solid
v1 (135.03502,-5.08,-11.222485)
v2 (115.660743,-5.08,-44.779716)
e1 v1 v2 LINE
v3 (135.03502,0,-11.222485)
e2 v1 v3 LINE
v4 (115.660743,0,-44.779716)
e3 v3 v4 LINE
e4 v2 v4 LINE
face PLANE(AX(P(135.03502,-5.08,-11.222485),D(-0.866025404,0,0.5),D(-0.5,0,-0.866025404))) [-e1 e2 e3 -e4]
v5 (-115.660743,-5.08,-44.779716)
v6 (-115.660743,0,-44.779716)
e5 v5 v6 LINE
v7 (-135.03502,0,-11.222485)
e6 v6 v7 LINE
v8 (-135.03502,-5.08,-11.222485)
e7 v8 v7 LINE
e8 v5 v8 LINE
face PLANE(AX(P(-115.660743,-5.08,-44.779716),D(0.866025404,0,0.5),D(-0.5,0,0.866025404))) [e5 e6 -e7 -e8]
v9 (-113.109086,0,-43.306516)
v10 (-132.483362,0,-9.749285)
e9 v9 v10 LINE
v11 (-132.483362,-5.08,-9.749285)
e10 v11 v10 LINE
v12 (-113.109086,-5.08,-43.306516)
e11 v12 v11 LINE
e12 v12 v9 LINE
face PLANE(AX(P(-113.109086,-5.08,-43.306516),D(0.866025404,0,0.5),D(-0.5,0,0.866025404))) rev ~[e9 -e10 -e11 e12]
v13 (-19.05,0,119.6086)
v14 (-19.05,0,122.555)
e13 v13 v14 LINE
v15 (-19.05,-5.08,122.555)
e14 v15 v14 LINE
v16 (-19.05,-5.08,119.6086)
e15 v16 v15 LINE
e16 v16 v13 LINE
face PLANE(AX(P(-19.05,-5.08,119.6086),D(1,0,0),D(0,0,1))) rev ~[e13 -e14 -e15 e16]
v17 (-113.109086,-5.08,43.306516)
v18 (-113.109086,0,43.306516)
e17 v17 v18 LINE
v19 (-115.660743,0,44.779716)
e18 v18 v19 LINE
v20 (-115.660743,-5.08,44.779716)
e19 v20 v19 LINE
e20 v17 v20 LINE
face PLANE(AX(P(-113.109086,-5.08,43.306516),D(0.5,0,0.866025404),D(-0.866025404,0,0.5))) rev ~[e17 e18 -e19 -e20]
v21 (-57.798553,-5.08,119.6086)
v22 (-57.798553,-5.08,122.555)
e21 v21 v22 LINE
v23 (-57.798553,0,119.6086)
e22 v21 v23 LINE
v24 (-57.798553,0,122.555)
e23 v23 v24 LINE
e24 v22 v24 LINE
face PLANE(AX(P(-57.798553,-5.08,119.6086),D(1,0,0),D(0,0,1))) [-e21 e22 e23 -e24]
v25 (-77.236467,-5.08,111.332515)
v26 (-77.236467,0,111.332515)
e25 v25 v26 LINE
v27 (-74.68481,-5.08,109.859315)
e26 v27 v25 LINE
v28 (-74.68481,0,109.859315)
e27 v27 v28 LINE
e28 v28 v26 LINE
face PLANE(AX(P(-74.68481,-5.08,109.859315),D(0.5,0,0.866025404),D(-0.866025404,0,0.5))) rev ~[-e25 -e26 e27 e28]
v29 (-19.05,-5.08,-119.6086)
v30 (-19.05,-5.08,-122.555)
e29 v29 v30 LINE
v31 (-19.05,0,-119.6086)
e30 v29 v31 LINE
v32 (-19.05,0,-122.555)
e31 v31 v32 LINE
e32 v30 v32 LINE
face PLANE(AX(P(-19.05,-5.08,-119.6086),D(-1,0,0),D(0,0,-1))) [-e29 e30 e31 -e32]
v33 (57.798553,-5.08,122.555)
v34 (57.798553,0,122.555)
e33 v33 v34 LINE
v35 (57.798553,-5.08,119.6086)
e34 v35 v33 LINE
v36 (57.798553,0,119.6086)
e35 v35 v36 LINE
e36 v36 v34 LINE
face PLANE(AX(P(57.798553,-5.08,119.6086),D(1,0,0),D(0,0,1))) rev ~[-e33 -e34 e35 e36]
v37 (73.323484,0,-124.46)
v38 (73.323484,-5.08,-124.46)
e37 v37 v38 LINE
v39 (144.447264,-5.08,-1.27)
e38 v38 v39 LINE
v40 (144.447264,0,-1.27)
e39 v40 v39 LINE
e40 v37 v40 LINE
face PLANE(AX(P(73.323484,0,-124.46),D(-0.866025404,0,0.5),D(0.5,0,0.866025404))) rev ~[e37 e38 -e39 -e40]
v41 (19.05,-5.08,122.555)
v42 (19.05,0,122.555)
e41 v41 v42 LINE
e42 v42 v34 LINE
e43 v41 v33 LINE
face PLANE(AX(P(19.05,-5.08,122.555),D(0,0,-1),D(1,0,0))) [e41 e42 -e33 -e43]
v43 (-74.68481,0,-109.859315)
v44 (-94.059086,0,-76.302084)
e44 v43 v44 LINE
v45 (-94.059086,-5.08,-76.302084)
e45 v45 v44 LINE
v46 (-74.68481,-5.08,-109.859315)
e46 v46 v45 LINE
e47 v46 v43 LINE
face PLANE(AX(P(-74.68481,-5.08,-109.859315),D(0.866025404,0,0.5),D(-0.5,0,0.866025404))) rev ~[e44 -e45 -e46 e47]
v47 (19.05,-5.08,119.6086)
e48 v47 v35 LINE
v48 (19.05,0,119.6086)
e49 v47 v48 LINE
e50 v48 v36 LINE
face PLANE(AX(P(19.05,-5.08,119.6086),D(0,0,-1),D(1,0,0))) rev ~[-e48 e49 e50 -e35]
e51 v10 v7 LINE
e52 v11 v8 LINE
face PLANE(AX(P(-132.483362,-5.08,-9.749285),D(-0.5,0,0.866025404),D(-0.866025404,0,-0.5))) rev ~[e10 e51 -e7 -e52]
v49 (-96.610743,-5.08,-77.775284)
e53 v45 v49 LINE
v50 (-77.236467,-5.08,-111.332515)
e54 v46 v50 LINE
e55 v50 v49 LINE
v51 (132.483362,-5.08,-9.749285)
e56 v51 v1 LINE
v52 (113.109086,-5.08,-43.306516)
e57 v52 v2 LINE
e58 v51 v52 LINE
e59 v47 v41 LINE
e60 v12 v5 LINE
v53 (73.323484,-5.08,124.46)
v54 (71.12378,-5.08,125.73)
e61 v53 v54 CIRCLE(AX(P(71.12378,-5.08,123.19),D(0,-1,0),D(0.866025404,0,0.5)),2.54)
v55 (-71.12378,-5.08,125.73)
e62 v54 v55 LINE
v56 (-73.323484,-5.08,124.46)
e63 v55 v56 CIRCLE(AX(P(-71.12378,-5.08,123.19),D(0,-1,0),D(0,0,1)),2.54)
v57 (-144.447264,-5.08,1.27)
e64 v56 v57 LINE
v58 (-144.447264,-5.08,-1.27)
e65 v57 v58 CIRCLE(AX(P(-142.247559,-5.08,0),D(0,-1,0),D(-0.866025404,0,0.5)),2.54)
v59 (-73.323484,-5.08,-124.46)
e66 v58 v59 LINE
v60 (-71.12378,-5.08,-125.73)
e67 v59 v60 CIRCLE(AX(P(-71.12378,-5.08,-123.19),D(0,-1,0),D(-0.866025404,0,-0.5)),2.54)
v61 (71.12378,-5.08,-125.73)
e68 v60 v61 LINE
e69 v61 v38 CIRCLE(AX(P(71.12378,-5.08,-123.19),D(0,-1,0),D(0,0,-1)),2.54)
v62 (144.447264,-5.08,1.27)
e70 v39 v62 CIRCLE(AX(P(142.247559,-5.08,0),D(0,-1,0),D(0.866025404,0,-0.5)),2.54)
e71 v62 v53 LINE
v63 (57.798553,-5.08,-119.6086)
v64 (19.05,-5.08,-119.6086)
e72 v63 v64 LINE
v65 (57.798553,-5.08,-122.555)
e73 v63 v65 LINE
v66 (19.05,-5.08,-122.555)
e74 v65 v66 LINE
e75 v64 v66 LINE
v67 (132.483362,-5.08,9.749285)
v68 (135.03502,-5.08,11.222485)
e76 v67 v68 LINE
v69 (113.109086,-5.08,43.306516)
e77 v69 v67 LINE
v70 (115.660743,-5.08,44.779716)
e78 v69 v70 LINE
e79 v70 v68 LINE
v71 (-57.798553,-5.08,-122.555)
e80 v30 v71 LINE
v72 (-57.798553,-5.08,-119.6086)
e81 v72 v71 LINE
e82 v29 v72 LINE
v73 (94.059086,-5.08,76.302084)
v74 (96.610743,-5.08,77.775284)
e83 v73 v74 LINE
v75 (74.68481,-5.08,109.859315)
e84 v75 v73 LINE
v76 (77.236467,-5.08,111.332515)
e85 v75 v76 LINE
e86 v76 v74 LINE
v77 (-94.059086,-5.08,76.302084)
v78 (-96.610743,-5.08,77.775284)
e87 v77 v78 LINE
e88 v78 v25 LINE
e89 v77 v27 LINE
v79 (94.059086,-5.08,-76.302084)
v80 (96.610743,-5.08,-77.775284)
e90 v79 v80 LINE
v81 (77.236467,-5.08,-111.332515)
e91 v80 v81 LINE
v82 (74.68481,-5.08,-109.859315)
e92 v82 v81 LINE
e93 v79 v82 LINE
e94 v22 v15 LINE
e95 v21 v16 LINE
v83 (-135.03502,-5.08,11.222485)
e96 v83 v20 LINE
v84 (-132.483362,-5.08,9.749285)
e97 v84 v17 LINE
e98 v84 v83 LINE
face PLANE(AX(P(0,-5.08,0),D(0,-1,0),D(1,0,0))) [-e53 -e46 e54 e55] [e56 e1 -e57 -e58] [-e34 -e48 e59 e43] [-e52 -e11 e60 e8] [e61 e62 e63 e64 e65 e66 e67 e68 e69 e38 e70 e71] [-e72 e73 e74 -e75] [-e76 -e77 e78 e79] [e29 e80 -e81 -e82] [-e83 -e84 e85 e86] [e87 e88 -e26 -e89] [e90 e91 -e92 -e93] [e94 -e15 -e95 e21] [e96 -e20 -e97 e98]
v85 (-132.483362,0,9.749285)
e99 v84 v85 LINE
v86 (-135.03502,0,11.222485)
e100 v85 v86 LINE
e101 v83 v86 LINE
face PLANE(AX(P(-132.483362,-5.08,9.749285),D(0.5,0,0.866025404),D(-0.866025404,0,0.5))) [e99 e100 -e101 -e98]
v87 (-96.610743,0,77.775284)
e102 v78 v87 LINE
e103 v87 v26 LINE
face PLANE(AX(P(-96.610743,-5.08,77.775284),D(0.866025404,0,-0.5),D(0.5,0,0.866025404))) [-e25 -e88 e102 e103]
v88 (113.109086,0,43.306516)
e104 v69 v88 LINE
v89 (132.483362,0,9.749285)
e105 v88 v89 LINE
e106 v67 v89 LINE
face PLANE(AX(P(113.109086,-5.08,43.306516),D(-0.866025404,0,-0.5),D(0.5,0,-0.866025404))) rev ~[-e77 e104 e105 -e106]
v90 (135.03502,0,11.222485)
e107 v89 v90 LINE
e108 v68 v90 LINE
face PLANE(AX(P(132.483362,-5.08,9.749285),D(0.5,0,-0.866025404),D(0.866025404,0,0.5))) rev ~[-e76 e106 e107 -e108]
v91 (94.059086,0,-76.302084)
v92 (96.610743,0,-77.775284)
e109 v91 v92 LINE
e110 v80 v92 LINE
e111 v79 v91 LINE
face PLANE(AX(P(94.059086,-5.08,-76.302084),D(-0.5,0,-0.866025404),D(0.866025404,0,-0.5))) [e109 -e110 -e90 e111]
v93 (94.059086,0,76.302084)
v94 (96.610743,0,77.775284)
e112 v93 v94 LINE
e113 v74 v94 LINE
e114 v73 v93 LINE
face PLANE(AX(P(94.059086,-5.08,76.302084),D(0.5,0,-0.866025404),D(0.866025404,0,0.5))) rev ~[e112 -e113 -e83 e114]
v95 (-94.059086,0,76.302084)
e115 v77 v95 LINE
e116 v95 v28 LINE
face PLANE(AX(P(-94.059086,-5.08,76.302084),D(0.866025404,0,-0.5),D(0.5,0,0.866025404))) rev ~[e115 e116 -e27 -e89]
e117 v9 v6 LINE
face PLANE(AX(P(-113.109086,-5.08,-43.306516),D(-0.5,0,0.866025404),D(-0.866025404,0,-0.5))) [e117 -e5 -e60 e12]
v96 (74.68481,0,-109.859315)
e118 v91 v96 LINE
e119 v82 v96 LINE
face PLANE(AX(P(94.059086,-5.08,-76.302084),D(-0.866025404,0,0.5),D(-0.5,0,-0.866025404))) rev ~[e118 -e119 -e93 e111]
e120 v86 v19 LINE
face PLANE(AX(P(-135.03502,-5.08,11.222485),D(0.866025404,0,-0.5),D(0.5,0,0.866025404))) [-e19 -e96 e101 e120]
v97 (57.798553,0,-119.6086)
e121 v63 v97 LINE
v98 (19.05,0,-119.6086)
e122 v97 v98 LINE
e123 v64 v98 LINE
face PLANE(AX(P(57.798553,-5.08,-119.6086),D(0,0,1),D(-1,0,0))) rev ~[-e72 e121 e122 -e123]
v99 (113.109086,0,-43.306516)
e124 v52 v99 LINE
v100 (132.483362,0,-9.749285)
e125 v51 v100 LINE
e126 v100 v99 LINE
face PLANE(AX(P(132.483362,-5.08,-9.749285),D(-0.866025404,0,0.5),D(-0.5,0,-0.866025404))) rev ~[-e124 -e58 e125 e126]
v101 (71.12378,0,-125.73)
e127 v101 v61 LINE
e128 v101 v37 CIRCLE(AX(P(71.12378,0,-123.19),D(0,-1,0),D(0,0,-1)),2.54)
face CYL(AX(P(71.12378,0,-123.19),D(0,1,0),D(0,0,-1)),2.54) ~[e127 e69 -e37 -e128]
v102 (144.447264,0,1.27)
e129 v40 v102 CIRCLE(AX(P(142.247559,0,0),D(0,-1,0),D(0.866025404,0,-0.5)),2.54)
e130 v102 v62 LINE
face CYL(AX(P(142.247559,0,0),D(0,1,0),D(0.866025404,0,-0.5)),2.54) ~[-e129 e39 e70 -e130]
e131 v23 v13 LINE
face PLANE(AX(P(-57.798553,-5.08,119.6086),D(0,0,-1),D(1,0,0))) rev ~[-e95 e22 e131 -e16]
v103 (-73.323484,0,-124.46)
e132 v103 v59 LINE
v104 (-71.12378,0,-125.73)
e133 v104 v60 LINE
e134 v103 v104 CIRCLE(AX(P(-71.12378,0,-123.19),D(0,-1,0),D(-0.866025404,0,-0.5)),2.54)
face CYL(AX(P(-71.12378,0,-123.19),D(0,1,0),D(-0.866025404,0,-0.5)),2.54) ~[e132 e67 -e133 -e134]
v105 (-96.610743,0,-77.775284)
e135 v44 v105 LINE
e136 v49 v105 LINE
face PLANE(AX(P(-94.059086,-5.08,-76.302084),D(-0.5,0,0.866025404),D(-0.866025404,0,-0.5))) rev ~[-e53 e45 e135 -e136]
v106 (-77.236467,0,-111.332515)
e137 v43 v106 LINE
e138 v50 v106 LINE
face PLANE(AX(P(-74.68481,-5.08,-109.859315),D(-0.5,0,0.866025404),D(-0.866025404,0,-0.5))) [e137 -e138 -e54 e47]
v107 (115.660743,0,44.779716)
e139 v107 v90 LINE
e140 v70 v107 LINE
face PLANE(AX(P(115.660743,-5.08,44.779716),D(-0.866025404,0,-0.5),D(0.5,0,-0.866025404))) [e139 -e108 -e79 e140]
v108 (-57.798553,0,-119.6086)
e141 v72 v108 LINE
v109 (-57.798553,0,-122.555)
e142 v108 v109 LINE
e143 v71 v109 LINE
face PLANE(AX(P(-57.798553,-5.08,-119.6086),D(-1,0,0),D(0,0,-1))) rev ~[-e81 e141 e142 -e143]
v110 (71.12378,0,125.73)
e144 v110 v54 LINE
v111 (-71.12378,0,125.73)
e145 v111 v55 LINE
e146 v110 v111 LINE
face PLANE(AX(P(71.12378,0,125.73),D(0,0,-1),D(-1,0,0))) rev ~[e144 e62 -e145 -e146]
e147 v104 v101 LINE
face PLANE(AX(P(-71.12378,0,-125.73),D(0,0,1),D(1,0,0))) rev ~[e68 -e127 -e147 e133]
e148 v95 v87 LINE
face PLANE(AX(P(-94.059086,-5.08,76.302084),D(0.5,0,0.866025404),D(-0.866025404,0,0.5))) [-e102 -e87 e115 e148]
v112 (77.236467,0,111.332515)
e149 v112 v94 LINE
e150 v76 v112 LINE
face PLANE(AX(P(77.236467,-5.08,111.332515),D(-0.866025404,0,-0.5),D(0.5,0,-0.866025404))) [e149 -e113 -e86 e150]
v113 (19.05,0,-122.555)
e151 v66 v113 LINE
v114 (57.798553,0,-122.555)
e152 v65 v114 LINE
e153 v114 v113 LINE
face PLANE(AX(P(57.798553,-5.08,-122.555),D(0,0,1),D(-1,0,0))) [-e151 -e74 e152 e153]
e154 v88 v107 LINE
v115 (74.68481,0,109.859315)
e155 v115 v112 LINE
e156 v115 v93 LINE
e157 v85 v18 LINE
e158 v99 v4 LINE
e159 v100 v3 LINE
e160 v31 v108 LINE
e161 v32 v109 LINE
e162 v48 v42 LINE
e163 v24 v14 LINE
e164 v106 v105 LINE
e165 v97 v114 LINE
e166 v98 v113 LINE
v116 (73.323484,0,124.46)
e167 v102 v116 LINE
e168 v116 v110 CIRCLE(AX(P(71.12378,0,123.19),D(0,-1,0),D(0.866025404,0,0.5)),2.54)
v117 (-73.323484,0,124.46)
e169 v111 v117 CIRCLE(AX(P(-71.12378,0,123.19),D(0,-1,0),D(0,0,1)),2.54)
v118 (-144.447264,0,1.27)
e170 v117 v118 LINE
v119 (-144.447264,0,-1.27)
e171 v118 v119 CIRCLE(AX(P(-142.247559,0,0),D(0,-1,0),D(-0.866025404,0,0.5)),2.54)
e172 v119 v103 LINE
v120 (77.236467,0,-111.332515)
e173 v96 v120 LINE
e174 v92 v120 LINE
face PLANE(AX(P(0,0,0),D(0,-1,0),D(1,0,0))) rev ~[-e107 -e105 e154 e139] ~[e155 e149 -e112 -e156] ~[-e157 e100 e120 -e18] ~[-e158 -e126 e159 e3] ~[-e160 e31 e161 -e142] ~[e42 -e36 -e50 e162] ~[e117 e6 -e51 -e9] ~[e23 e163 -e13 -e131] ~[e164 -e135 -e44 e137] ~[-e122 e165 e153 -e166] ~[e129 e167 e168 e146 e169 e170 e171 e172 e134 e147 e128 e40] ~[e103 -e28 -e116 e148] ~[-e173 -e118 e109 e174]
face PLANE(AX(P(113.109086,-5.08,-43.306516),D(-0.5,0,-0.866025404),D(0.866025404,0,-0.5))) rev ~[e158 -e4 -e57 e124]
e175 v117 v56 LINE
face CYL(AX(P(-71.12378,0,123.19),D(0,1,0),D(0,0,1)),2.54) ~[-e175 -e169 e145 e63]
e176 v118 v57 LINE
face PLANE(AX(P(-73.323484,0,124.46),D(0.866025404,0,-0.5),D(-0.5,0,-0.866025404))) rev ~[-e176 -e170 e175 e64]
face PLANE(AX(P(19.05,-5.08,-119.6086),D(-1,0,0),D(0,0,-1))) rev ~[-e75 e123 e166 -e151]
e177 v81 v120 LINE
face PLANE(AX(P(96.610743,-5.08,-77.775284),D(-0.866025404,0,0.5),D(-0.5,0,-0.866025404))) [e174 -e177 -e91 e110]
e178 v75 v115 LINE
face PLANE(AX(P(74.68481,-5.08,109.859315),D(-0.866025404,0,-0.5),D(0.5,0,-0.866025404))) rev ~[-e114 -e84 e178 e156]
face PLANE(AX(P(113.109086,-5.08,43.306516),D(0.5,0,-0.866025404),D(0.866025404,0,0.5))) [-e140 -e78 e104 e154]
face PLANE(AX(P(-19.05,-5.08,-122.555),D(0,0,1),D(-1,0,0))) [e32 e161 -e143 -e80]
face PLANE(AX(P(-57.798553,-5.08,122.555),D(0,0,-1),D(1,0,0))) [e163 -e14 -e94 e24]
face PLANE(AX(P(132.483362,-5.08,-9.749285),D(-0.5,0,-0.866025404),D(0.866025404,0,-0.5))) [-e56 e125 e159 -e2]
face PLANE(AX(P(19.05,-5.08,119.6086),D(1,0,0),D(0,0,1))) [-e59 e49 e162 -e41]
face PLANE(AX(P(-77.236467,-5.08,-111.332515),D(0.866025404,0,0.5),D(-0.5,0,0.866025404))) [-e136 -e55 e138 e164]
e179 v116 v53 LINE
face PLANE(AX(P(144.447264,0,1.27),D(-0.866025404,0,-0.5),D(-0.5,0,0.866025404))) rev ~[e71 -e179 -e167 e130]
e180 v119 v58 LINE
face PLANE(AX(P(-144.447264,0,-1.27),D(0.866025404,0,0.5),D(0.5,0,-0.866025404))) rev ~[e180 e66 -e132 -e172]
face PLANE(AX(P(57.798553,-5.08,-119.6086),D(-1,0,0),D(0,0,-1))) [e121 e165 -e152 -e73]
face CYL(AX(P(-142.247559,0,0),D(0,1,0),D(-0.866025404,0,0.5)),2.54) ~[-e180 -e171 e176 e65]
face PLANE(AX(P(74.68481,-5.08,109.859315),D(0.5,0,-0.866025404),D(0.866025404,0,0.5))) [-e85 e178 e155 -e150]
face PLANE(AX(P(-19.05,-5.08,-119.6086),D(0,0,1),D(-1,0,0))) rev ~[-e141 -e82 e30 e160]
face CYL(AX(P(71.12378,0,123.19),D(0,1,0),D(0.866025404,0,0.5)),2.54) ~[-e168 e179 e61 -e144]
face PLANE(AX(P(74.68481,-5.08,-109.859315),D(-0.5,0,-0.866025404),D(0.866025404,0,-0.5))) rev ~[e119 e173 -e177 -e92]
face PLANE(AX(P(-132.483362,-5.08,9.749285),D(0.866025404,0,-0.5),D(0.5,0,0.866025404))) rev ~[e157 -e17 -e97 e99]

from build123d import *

# Parameters (mm, degrees)
F1_DEPTH        = 5.08
F2_W            = 38.7485525078
F2_H            = 2.9464
F3_DEPTH        = 5.08
F3_COPIES_COUNT = 6


# Not quite as in the source:
# - a pattern or mirror of a feature is missing from the dataset's text; its kind, count and spacing are read off the source's solid


with BuildPart() as f1:
    # F0 (on Front) → F1 (new body)
    with BuildSketch(Plane.XZ):
        with BuildLine():
            Line((71.1237796615, 125.73), (-71.1237796615, 125.73))
            ThreePointArc((-71.1237796615, 125.73), (-72.3937796615, 125.3897045256), (-73.3234841871, 124.46))
            Line((-73.3234841871, 124.46), (-144.4472638486, 1.27))
            ThreePointArc((-144.4472638486, 1.27), (-144.7875593229, 0), (-144.4472638486, -1.27))
            Line((-144.4472638486, -1.27), (-73.3234841871, -124.46))
            ThreePointArc((-73.3234841871, -124.46), (-72.3937796615, -125.3897045256), (-71.1237796615, -125.73))
            Line((-71.1237796615, -125.73), (71.1237796615, -125.73))
            ThreePointArc((71.1237796615, -125.73), (72.3937796615, -125.3897045256), (73.3234841871, -124.46))
            Line((73.3234841871, -124.46), (144.4472638486, -1.27))
            ThreePointArc((144.4472638486, -1.27), (144.7875593229, 0), (144.4472638486, 1.27))
            Line((144.4472638486, 1.27), (73.3234841871, 124.46))
            ThreePointArc((73.3234841871, 124.46), (72.3937796615, 125.3897045256), (71.1237796615, 125.73))
        make_face()
    extrude(amount=F1_DEPTH)

    # F2 (on face) → F3 (cut, through all)
    with BuildSketch(Plane.XZ.offset(5.08)):
        with Locations((-38.4242762539, 121.0818)):
            Rectangle(F2_W, F2_H)
        with Locations((38.4242762539, 121.0818)):
            Rectangle(F2_W, F2_H)
    f3 = extrude(amount=-F3_DEPTH, mode=Mode.SUBTRACT)

    # F3_copies: F3 ×6 about axis
    f3_copies_axis = Axis((0, 0, 0), (0, 1, 0))
    for i in range(1, F3_COPIES_COUNT):
        add(f3.rotate(f3_copies_axis, i * 360 / F3_COPIES_COUNT), mode=Mode.SUBTRACT)


solid = f1.part
